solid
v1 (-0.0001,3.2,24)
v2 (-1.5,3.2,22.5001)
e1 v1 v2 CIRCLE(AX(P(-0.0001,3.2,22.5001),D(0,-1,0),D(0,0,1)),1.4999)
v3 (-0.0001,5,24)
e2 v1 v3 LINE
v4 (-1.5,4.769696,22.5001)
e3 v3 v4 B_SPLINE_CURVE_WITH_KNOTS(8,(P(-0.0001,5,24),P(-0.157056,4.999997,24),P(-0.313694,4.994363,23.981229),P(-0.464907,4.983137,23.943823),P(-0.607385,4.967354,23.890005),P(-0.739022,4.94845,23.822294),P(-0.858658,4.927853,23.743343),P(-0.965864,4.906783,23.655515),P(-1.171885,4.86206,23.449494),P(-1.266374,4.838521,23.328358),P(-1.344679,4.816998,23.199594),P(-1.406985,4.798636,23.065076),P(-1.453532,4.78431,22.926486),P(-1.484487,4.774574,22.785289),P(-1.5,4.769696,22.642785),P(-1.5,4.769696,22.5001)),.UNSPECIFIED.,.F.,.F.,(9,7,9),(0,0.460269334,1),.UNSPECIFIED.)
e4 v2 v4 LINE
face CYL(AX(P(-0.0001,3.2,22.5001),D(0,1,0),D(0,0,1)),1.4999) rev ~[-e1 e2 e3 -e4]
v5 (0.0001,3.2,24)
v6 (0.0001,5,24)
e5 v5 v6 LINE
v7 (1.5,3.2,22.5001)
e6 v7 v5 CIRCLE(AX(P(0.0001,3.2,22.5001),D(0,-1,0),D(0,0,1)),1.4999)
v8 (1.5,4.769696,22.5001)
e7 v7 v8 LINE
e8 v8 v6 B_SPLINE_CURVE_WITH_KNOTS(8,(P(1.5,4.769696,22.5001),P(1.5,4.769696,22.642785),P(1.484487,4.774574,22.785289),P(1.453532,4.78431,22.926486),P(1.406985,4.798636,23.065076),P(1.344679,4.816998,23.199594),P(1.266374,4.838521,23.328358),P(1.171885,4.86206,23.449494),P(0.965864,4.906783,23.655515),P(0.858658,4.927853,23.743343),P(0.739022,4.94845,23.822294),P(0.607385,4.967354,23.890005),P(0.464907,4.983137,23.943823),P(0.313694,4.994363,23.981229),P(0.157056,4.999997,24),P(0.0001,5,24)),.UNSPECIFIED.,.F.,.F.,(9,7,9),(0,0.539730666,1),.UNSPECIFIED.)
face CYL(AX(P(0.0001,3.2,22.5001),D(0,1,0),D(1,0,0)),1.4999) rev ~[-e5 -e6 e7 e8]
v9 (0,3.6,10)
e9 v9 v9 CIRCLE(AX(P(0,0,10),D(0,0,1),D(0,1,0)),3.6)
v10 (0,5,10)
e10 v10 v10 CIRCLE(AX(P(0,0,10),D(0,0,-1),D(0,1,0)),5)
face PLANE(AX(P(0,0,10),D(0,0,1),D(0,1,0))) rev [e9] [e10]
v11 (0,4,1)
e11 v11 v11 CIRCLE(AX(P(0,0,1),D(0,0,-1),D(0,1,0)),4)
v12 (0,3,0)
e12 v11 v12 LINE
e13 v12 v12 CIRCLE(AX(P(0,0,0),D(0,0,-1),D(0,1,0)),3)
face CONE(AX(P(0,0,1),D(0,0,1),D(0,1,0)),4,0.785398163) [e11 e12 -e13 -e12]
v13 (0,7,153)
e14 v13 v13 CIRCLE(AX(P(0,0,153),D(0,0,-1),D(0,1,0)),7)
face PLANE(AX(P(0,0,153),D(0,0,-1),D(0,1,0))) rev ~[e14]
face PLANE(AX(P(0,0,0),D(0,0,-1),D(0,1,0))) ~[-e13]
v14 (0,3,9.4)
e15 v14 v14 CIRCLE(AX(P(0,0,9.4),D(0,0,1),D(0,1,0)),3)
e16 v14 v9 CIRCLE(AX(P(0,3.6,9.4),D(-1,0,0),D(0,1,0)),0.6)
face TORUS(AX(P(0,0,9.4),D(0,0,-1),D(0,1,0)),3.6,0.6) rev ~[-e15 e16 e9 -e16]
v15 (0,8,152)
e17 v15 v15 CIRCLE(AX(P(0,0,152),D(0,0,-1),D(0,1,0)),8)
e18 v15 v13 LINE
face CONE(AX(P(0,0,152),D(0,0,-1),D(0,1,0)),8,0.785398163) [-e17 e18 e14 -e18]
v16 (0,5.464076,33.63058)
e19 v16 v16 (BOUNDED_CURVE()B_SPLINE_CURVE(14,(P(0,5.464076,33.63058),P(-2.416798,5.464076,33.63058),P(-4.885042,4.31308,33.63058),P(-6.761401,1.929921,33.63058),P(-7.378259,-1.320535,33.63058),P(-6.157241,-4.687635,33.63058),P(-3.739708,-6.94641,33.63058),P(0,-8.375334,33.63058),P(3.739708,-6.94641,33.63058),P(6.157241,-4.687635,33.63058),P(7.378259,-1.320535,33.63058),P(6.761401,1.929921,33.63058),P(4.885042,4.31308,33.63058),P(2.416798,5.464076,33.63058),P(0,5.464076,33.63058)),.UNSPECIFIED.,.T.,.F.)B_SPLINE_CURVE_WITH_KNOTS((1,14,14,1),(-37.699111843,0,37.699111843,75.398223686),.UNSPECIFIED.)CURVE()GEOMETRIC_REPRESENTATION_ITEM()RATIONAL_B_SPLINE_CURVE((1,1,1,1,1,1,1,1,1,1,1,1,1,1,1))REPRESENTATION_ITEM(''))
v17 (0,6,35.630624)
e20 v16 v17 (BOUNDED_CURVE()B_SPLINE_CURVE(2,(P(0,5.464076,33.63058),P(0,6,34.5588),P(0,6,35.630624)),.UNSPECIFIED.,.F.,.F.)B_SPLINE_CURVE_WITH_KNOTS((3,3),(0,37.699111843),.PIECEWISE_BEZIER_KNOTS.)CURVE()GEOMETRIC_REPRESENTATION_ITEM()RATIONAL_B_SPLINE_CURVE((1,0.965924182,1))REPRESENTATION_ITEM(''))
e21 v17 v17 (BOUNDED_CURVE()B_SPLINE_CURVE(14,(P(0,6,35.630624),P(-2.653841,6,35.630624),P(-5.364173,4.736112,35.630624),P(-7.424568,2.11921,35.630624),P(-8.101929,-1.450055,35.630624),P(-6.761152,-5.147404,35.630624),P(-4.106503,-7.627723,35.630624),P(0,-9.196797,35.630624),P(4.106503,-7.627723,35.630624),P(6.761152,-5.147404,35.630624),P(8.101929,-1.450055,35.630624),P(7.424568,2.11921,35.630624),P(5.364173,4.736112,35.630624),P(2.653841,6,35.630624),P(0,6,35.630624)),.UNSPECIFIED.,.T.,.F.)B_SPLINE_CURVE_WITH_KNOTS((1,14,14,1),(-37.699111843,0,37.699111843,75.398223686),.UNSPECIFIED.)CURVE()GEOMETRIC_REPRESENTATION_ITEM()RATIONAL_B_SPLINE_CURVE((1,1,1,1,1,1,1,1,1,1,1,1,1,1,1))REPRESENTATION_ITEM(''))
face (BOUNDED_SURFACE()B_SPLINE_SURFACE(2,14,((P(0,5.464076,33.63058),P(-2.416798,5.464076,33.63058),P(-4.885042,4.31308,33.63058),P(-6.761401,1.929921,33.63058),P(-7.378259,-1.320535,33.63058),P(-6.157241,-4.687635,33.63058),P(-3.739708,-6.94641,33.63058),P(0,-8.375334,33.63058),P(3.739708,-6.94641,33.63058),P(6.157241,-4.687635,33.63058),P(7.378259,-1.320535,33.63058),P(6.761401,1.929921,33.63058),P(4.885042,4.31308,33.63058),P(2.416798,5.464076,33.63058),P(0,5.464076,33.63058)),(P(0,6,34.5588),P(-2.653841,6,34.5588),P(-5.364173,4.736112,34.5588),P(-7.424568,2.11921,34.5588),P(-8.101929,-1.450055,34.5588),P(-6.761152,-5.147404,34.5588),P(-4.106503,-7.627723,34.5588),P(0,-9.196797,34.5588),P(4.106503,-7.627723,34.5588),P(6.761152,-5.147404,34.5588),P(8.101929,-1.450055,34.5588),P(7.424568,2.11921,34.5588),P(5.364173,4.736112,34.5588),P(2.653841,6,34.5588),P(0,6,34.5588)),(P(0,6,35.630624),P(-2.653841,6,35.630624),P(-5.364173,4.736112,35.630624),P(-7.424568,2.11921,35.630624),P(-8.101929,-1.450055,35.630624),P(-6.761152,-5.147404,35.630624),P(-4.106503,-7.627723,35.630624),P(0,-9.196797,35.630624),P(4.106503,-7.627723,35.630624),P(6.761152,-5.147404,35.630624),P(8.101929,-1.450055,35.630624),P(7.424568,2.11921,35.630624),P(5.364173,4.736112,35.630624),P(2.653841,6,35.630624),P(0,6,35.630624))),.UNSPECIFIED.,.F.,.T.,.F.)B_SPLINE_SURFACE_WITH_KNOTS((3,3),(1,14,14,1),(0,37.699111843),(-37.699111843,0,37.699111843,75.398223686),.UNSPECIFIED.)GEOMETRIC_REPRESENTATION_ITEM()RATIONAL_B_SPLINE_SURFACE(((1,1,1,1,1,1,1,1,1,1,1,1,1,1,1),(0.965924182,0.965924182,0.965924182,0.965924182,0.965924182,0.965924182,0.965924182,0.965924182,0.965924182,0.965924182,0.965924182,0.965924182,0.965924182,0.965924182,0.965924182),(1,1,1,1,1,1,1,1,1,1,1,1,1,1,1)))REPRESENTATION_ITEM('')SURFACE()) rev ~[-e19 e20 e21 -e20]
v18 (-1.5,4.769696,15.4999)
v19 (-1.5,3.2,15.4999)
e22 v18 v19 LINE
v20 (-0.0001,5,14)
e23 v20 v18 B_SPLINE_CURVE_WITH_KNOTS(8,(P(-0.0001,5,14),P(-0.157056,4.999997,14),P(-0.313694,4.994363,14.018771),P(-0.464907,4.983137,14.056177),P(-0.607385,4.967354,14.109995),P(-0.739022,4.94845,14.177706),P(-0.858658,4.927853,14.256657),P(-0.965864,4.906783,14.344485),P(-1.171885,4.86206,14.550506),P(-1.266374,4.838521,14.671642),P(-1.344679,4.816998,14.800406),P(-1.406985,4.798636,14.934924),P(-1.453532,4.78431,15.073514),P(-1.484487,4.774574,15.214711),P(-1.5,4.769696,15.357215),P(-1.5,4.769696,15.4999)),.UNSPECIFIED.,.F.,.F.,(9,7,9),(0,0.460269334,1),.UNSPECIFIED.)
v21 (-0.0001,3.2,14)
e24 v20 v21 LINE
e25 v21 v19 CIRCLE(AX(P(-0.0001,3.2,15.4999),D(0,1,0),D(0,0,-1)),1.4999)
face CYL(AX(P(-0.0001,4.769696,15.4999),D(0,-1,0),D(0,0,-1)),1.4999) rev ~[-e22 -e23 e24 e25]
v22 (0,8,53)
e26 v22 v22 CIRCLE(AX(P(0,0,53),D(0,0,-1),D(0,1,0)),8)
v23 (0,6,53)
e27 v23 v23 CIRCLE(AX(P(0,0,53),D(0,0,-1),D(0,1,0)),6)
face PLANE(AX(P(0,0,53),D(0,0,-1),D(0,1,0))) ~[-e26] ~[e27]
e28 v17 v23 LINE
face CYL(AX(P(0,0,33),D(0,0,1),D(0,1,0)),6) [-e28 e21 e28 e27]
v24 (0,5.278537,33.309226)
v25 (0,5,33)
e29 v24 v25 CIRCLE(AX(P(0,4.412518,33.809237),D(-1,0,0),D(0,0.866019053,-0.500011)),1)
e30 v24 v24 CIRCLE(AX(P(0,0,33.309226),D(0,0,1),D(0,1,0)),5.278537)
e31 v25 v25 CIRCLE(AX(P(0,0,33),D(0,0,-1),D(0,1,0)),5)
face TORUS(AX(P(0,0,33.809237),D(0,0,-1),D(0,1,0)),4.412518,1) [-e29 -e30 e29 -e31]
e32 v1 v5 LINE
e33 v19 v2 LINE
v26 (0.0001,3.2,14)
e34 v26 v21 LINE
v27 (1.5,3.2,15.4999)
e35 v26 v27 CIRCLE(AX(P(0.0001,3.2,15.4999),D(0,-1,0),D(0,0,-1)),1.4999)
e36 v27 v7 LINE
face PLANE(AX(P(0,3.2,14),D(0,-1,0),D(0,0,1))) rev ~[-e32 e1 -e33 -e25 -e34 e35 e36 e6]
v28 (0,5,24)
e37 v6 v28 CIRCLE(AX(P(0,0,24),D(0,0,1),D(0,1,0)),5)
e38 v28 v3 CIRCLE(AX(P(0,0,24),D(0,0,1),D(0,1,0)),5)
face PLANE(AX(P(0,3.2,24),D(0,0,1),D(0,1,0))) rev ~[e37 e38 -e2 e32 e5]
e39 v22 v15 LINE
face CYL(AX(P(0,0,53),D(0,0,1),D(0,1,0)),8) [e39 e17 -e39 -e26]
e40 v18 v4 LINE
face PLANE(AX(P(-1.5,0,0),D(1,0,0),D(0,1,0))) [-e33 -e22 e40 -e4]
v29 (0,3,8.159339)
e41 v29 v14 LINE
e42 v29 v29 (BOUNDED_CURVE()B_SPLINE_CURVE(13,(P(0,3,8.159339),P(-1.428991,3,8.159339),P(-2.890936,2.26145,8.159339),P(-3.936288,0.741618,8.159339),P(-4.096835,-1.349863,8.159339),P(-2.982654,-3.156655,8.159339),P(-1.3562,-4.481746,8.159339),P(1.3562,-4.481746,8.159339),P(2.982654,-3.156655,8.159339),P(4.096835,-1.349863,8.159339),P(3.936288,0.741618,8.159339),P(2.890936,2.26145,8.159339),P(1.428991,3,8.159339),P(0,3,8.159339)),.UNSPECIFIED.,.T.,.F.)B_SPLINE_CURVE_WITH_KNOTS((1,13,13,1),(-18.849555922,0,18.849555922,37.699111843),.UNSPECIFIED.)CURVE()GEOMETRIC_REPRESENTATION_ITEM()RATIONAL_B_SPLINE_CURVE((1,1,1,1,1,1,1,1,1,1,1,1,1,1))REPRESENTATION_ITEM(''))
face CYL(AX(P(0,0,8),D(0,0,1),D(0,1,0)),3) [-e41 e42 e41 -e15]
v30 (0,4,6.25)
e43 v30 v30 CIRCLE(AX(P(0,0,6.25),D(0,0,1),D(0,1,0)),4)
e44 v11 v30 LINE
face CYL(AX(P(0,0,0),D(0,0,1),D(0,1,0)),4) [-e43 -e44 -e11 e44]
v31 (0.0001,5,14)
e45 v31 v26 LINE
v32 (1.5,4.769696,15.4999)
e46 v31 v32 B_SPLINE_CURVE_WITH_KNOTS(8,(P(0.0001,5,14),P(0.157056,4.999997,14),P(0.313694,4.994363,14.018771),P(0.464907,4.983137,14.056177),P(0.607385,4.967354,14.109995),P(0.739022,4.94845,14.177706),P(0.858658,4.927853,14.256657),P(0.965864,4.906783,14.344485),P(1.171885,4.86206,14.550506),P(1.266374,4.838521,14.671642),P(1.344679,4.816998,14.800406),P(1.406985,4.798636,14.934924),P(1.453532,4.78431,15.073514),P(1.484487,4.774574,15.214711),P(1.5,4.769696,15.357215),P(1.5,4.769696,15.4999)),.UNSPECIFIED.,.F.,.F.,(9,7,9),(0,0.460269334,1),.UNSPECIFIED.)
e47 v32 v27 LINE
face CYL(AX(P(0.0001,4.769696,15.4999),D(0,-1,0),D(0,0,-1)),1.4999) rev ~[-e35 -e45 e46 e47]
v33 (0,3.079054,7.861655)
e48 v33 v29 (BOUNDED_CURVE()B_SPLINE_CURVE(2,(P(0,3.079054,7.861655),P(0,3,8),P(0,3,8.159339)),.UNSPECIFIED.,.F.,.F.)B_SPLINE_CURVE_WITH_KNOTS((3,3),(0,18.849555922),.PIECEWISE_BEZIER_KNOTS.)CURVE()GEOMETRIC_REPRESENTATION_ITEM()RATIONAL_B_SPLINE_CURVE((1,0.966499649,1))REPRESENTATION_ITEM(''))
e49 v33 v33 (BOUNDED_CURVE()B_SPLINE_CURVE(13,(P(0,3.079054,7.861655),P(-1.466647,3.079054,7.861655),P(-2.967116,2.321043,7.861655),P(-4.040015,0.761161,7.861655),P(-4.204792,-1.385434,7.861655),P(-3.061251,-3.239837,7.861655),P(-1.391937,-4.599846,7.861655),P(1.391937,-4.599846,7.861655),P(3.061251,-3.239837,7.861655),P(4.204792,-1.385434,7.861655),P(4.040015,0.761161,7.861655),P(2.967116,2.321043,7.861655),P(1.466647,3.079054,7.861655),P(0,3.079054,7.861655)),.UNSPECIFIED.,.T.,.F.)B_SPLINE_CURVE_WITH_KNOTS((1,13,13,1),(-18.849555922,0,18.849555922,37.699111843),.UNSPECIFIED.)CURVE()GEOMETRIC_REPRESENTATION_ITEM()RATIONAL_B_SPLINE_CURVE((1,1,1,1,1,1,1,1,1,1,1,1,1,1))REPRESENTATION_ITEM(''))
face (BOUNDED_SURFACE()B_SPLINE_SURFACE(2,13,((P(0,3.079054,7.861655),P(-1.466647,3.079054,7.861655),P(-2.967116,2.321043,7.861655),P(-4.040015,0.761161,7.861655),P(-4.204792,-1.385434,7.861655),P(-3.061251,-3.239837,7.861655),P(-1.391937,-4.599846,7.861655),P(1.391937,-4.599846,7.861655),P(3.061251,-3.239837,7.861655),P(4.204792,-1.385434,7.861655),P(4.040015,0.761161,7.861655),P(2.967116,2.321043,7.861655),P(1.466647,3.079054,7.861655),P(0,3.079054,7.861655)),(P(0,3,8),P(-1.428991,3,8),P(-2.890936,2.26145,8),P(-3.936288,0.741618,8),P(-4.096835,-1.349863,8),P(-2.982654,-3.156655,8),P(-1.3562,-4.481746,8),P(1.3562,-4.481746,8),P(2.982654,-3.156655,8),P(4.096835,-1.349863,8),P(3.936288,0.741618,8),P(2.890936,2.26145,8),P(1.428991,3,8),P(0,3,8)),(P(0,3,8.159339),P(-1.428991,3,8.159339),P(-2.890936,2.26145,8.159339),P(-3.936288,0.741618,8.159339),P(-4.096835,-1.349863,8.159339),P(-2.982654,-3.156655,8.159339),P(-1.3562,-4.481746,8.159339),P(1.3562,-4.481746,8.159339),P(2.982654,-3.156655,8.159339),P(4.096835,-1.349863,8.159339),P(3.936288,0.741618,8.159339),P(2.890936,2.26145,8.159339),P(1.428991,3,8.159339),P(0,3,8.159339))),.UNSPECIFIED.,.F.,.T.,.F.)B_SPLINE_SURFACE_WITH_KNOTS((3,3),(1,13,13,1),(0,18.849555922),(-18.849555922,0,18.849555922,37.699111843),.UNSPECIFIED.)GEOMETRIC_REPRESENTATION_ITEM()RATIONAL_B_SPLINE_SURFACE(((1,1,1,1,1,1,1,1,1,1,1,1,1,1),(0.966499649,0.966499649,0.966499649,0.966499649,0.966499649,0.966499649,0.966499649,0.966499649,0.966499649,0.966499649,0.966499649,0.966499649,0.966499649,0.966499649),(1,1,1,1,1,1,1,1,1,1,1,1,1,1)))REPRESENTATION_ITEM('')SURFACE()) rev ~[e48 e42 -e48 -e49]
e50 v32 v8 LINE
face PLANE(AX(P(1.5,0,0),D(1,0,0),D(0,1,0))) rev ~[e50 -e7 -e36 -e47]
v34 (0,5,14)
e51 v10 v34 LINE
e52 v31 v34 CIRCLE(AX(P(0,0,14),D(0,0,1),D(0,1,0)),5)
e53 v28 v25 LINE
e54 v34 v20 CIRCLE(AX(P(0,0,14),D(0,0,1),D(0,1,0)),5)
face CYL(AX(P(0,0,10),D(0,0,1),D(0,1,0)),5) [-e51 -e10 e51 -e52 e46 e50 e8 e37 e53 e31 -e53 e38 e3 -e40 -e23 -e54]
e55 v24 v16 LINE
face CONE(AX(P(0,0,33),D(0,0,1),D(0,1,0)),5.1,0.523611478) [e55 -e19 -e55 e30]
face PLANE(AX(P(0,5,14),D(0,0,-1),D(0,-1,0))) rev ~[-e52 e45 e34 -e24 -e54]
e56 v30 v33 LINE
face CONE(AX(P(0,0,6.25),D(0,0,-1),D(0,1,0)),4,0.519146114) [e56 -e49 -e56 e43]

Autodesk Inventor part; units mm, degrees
ref_plane "YZ Plane" through (0, 0, 0) normal (1, 0, 0) x (0, 1, 0)
ref_plane "XZ Plane" through (0, 0, 0) normal (0, 1, 0) x (-1, 0, 0)
ref_plane "XY Plane" through (0, 0, 0) normal (0, 0, 1) x (1, 0, 0)
sketch "스케치1" plane through (0, 0, 0) normal (1, 0, 0) x (0, 1, 0)
  line L0 (0, 0) -> (4, 0)
  line L1 (4, 0) -> (4, 10)
  line L2 (4, 10) -> (0, 10)
  line L3 (0, 10) -> (0, 0)
  line L4 (0, 10) -> (5, 10)
  line L5 (5, 10) -> (5, 33)
  line L6 (5, 33) -> (0, 33)
  line L7 (0, 33) -> (0, 10)
  line L8 (0, 33) -> (6, 33)
  line L9 (6, 33) -> (6, 53)
  line L10 (6, 53) -> (0, 53)
  line L11 (0, 53) -> (0, 33)
  line L12 (0, 53) -> (8, 53)
  line L13 (8, 53) -> (8, 153)
  line L14 (8, 153) -> (0, 153)
  line L15 (0, 153) -> (0, 53)
  dimension "d0" = 100
  dimension "d1" = 20
  dimension "d2" = 23
  dimension "d3" = 10
  dimension "d4" = 8
  dimension "d5" = 10
  dimension "d6" = 12
  dimension "d7" = 16
revolve "회전1" add sketch "스케치1" angle 360 about axis through (0, 0, 33) along (0, 0, -1)
thread "스레드1" size "M8x1.25" class "6g" standard "ANSI Metric M Profile" full length
sketch "스케치2" plane through (0, 0, 0) normal (1, 0, 0) x (0, 1, 0)
  line L0 (6, 53) -> (6, 33) projected
  line L1 (-6, 33) -> (6, 33) projected
  line L2 (6, 33) -> (6, 34.5588)
  line L3 (6, 33) -> (5.1, 33)
  line L4 (5.1, 33) -> (6, 34.5588)
  line L5 (0, -30.6) -> (0, 183.6) projected
  point P0 (0, 0)
  dimension "d11" = 0.9
  dimension "d12" = 30
revolve "회전2" cut sketch "스케치2" angle 360 about axis through (0, 0, -10) along (0, 0, 1)
fillet "모깎기1" radius 4 1 edges at (0, -6, 34.5588)
fillet "모깎기2" radius 1 1 edges at (0, -5.1, 33)
sketch "스케치3" plane through (0, 0, 0) normal (1, 0, 0) x (0, 1, 0)
  line L0 (5, 33) -> (5, 10) projected
  line L1 (5, 14) -> (3.2, 14)
  line L2 (3.2, 14) -> (3.2, 24)
  line L3 (3.2, 24) -> (5, 24)
  line L4 (5, 24) -> (5, 14)
  point P0 (0, 0)
  dimension "d16" = 1.8
  dimension "d17" = 10
  dimension "d18" = 4
extrude "돌출1" cut sketch "스케치3" along normal mid plane 3
fillet "모깎기3" radius 1.5 4 edges at (1.5, 3.9848, 14) (-1.5, 3.9848, 14) (-1.5, 3.9848, 24) (1.5, 3.9848, 24)
chamfer "모따기1" distance 1 angle 45 2 edges at (0, -8, 153) (0, -4, 0)
sketch "스케치4" plane through (0, 0, 0) normal (1, 0, 0) x (0, 1, 0)
  line L0 (4, 10) -> (4, 6.25)
  line L1 (4, 6.25) -> (3, 8)
  line L2 (3, 8) -> (3, 10)
  line L3 (3, 10) -> (4, 10)
  line L4 (-5, 10) -> (5, 10) projected
  line L5 (0, -30.6) -> (0, 183.6) projected
  point P0 (0, 0)
  dimension "d25" = 1
  dimension "d26" = 2
  dimension "d27" = 3.75
revolve "회전3" cut sketch "스케치4" angle 360 about axis through (0, 0, -10) along (0, 0, 1)
fillet "모깎기4" radius 0.6 2 edges at (0, -3, 8) (0, -3, 10)
properties part number "도면1-2번"
